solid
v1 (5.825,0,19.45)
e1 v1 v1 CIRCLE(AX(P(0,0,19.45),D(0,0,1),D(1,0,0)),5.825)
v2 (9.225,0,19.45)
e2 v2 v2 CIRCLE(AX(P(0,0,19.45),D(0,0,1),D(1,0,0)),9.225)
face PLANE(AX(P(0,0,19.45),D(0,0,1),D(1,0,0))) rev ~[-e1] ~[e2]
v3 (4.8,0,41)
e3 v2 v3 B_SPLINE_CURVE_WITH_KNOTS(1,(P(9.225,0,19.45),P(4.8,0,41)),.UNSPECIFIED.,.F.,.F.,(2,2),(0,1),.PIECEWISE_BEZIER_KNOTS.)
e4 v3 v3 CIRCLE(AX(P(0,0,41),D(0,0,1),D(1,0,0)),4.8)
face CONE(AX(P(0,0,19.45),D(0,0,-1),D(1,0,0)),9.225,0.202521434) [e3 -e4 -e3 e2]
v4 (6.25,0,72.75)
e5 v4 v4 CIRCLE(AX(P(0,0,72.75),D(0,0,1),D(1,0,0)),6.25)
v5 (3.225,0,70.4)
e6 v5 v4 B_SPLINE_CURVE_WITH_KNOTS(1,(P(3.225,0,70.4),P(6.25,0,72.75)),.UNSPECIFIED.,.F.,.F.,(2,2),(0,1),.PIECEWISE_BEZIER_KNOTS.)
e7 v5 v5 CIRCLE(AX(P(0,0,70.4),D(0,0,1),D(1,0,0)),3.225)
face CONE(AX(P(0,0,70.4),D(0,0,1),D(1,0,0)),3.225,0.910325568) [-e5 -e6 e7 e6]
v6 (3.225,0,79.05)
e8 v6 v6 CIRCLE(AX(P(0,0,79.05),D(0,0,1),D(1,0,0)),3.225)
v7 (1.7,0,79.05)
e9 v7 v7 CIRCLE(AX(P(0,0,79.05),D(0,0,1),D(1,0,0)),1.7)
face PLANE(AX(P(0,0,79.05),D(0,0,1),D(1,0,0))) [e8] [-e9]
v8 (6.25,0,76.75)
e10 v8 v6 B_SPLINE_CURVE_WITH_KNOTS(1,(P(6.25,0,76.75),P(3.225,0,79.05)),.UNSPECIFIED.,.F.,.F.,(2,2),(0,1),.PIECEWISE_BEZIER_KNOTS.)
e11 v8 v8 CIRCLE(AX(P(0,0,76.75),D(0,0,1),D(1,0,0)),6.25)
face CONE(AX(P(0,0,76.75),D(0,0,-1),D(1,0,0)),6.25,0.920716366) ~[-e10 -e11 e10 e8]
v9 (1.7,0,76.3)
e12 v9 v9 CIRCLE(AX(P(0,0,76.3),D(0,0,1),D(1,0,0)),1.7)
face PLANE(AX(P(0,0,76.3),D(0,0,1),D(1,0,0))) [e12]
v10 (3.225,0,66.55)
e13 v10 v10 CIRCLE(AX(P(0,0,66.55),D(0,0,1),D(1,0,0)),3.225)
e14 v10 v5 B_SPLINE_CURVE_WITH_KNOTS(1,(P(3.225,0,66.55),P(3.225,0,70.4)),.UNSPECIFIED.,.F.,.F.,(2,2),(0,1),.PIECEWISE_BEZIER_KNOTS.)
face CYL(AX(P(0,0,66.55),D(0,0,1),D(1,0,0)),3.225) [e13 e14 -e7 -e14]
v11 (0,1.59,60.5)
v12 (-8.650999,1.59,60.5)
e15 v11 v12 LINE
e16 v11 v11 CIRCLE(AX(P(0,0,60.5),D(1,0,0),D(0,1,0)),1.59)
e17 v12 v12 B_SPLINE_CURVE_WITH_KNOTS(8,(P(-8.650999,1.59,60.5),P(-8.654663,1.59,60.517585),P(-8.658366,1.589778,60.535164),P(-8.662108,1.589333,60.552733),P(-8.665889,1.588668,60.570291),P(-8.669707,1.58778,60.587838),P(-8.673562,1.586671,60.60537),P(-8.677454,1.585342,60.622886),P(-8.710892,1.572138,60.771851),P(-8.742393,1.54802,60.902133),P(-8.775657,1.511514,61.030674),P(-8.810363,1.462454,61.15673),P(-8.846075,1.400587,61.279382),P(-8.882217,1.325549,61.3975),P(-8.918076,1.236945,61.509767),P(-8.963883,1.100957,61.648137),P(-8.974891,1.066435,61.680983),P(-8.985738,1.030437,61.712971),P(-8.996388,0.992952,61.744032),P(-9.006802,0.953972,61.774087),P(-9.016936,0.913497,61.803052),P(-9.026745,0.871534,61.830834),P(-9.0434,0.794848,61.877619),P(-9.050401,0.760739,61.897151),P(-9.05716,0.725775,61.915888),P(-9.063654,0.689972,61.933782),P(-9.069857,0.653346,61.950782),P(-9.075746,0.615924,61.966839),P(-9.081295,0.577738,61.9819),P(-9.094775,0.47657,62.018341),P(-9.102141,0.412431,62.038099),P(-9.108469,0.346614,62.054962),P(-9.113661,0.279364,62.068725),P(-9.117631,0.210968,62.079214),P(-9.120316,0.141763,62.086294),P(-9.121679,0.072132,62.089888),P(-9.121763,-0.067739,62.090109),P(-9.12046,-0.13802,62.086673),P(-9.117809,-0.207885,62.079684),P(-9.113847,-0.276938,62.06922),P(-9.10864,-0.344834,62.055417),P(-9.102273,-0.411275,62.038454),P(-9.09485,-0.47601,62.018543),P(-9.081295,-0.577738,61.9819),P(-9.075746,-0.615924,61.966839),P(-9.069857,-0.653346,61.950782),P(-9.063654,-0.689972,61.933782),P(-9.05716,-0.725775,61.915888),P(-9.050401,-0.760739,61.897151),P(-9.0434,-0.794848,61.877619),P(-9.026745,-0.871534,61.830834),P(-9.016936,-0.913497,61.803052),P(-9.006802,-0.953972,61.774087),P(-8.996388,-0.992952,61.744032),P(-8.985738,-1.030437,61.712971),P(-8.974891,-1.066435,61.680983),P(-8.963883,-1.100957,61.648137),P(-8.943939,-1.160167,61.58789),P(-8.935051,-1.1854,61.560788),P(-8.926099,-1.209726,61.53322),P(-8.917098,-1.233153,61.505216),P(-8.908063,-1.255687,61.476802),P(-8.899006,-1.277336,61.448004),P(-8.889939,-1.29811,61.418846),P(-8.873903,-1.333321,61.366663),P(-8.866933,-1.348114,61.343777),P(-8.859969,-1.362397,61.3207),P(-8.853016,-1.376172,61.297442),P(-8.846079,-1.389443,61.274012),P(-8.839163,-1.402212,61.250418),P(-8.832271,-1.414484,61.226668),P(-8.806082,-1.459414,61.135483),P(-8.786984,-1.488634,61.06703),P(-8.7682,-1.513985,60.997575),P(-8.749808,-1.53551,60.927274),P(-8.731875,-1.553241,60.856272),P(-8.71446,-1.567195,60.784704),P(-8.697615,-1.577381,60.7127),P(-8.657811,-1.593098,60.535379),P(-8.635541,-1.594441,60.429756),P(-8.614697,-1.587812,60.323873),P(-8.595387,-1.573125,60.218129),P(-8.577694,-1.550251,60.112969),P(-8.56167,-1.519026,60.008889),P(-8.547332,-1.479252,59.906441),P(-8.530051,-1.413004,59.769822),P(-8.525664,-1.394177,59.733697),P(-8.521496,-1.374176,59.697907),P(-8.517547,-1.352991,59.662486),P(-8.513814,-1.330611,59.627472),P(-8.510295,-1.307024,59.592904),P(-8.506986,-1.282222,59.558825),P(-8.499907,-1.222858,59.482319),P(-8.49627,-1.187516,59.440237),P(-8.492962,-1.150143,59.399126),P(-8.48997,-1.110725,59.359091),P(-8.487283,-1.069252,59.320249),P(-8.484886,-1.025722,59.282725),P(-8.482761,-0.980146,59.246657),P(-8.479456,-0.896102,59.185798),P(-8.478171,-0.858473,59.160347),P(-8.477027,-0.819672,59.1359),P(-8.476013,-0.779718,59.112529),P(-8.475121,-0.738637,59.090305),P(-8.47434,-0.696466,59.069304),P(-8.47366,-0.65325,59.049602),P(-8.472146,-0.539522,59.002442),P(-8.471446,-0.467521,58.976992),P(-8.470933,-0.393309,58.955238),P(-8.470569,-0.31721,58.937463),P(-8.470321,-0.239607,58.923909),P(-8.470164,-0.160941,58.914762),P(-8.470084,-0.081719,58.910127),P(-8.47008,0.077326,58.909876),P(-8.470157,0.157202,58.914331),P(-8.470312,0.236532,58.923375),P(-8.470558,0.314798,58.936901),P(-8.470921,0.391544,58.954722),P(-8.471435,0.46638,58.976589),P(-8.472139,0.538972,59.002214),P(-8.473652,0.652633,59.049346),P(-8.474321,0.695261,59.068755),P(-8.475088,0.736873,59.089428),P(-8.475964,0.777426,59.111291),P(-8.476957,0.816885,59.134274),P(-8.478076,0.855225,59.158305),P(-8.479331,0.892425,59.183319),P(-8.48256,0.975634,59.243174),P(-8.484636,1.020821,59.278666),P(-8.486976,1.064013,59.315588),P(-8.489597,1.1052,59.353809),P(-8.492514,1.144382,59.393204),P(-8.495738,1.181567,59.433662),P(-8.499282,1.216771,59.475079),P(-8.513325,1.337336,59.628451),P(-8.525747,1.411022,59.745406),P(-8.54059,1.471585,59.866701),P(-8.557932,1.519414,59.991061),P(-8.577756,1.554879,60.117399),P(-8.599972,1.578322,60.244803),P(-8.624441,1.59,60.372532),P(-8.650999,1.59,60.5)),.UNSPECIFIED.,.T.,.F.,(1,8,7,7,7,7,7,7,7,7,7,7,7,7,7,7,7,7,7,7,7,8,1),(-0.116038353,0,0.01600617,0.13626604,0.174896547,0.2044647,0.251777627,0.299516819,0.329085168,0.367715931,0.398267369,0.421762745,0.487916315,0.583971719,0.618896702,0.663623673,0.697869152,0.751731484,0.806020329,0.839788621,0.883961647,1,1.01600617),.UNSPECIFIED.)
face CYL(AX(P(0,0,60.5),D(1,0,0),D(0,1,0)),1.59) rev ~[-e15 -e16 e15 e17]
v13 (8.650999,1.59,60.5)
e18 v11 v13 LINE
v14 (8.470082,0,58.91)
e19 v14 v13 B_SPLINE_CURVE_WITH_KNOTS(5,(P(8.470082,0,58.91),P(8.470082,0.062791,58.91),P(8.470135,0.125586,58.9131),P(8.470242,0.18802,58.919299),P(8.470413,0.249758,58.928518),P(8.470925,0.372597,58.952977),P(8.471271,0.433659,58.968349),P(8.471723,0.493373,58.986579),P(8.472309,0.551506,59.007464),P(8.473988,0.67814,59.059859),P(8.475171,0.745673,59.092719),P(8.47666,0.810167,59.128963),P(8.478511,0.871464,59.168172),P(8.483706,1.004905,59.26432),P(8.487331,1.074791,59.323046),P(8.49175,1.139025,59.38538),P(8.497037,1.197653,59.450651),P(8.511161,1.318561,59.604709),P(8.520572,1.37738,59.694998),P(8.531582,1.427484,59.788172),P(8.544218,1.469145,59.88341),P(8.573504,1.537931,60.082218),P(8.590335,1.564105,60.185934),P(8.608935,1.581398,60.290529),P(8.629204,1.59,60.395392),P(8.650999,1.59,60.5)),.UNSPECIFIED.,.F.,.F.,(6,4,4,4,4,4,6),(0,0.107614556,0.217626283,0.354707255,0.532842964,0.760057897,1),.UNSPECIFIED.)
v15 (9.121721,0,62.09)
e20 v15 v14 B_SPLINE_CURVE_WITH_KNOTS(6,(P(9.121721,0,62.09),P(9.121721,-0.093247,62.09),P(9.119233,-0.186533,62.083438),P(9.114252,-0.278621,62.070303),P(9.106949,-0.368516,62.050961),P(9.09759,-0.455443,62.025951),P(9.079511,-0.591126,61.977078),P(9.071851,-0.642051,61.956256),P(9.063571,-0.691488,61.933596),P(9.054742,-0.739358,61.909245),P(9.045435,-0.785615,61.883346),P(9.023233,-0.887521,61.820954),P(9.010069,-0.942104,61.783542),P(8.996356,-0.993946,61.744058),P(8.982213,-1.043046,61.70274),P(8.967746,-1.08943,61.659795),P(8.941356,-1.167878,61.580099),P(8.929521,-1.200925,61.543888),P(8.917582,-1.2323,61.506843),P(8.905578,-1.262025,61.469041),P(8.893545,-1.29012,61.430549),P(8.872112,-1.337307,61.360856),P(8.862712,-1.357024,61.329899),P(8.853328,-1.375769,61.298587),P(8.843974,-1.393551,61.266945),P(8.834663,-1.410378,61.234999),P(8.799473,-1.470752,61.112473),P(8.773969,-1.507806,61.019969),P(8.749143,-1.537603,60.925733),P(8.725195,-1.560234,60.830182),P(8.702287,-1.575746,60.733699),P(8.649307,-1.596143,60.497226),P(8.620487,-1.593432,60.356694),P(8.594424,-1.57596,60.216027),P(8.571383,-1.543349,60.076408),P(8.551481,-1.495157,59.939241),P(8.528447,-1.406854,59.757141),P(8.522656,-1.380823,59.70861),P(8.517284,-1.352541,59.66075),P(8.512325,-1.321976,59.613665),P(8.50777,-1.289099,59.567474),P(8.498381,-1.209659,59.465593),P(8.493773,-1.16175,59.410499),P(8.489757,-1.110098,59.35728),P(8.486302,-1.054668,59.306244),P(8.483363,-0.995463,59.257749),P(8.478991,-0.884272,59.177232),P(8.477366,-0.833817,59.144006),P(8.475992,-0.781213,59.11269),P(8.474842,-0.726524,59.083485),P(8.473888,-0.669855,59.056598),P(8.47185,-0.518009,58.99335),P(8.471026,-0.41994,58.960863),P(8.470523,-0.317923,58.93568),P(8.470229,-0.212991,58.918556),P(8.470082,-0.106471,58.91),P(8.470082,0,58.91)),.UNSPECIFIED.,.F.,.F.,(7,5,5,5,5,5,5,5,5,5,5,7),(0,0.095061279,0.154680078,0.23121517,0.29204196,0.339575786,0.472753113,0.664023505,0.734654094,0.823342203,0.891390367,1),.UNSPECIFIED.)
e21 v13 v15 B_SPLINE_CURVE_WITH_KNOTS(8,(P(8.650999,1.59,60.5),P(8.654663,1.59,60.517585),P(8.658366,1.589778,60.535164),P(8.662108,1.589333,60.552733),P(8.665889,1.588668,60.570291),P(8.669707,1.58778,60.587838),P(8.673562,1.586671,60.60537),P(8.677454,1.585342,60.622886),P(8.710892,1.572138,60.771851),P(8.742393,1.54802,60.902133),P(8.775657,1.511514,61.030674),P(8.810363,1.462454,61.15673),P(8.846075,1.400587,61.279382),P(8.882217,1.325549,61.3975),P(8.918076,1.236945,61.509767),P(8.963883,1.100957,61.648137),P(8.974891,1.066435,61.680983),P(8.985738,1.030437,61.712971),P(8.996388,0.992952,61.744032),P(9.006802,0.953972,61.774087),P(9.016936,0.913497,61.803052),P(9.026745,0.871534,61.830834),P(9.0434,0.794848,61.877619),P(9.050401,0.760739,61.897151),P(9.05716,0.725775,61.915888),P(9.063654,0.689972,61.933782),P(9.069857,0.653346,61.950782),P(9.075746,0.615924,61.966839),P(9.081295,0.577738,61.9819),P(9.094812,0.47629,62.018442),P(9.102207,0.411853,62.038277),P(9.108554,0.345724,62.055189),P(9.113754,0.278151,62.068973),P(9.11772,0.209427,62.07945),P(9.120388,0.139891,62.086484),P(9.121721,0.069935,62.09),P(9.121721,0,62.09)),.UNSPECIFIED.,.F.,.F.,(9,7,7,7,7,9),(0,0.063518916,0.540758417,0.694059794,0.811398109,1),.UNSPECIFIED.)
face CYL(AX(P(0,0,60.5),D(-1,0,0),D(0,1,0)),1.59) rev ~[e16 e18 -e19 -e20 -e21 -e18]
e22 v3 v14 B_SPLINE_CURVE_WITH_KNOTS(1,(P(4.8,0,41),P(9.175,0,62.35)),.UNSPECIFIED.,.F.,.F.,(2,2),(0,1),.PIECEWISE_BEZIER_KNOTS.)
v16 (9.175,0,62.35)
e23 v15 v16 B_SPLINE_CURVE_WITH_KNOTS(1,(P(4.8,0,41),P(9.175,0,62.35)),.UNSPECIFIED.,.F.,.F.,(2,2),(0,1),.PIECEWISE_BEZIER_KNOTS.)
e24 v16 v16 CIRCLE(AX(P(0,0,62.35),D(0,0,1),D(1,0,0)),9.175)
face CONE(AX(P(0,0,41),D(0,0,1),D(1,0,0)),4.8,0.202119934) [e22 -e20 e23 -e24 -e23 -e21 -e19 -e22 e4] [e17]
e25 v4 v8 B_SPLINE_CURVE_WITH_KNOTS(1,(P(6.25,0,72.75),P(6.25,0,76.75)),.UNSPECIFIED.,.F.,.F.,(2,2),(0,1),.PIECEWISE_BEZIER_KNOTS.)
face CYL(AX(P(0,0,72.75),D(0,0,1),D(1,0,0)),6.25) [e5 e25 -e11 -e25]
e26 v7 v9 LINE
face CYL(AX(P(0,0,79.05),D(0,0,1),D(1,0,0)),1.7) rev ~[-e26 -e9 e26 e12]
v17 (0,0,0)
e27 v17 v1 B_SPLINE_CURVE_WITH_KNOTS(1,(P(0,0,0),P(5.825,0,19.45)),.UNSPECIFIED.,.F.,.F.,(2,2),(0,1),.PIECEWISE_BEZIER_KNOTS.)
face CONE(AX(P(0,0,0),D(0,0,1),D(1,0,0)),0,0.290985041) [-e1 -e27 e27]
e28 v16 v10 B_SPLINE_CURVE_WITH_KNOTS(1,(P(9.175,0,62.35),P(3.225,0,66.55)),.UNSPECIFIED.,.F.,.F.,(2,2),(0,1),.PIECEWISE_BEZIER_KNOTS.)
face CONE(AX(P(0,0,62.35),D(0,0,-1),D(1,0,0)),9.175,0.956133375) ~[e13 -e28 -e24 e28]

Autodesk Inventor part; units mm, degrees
ref_plane "YZ Plane" through (0, 0, 0) normal (1, 0, 0) x (0, 1, 0)
ref_plane "XZ Plane" through (0, 0, 0) normal (0, 1, 0) x (-1, 0, 0)
sketch "Boceto1" plane through (0, 0, 0) normal (1, 0, 0) x (0, 1, 0)
  point P0 (0, 0)
sketch "Boceto2" plane through (0, 0, 0) normal (1, 0, 0) x (0, 1, 0)
  point P0 (0, 0)
  point P1 (0, 0)
ref_plane "Plano de trabajo1" through (0, 0, 19.45) normal (0, 0, 1) x (1, 0, 0)
sketch "Boceto3" plane through (0, 0, 19.45) normal (0, 0, 1) x (1, 0, 0)
  circle A0 centre (0, 0) radius 5.825
  dimension "d1" = 11.65
ref_plane "Plano de trabajo3" through (0, 0, 62.35) normal (0, 0, 1) x (1, 0, 0)
ref_plane "Plano de trabajo2" through (0, 0, 41) normal (0, 0, 1) x (1, 0, 0)
sketch "Boceto4" plane through (0, 0, 19.45) normal (0, 0, 1) x (1, 0, 0)
  circle A0 centre (0, 0) radius 9.225
  dimension "d4" = 18.45
sketch "Boceto5" plane through (0, 0, 41) normal (0, 0, 1) x (1, 0, 0)
  circle A0 centre (0, 0) radius 4.8
  dimension "d5" = 9.6
sketch "Boceto6" plane through (0, 0, 62.35) normal (0, 0, 1) x (1, 0, 0)
  circle A0 centre (0, 0) radius 9.175
  dimension "d6" = 18.35
ref_plane "Plano de trabajo4" through (0, 0, 66.55) normal (0, 0, 1) x (1, 0, 0)
sketch "Boceto7" plane through (0, 0, 66.55) normal (0, 0, 1) x (1, 0, 0)
  point P0 (0, 0)
sketch "Boceto8" plane through (0, 0, 66.55) normal (0, 0, 1) x (1, 0, 0)
  circle A0 centre (0, 0) radius 3.225
  dimension "d8" = 6.45
ref_plane "Plano de trabajo5" through (0, 0, 70.4) normal (0, 0, 1) x (1, 0, 0)
sketch "Boceto9" plane through (0, 0, 70.4) normal (0, 0, 1) x (1, 0, 0)
  circle A0 centre (0, 0) radius 3.225
  dimension "d10" = 6.45
loft "Solevación1" add profiles "Boceto3" section 1 point at (0, 0, 0)
loft "Solevación2" add profiles "Boceto4", "Boceto5"
loft "Solevación3" add profiles "Boceto6" section 1 edges at (-4.8, 0, 41)
loft "Solevación4" add profiles "Boceto8" section 1 edges at (-9.175, 0, 62.35)
loft "Solevación5" add profiles "Boceto9" section 1 edges at (-3.225, 0, 66.55)
ref_plane "Plano de trabajo8" through (0, 0, 79.05) normal (0, 0, 1) x (1, 0, 0)
ref_plane "Plano de trabajo7" through (0, 0, 76.75) normal (0, 0, 1) x (1, 0, 0)
sketch "Boceto10" plane through (0, 0, 72.75) normal (0, 0, 1) x (1, 0, 0)
  circle A0 centre (0, 0) radius 6.25
  dimension "d34" = 12.5
sketch "Boceto11" plane through (0, 0, 76.75) normal (0, 0, 1) x (1, 0, 0)
  circle A0 centre (0, 0) radius 6.25
  dimension "d35" = 12.5
sketch "Boceto12" plane through (0, 0, 79.05) normal (0, 0, 1) x (1, 0, 0)
  point P0 (0, 0)
sketch "Boceto13" plane through (0, 0, 79.05) normal (0, 0, 1) x (1, 0, 0)
  circle A0 centre (0, 0) radius 3.225
  dimension "d36" = 6.45
loft "Solevación6" add profiles "Boceto10" section 1 edges at (-3.225, 0, 70.4)
loft "Solevación7" add profiles "Boceto11" section 1 edges at (-6.25, 0, 72.75)
loft "Solevación8" add profiles "Boceto13" section 1 edges at (-6.25, 0, 76.75)
sketch "Boceto14" plane through (0, 0, 79.05) normal (0, 0, 1) x (1, 0, 0)
  circle A0 centre (0, 0) radius 1.7
  dimension "d49" = 3.4
extrude "Extrusión1" cut sketch "Boceto14" against normal blind 2.75
sketch "Sketch15" plane through (0, 0, 0) normal (1, 0, 0) x (0, 1, 0)
  circle A0 centre (0, 60.5) radius 1.59
  point P0 (0, 0)
  dimension "d52" = 3.18
  dimension "d53" = 60.5
extrude "Extrusion2" cut sketch "Sketch15" along normal through all both and the other way through all
ref_plane "Plano de trabajo6" through (0, 0, 72.75) normal (0, 0, 1) x (1, 0, 0)
properties part number "BAILARINA"
